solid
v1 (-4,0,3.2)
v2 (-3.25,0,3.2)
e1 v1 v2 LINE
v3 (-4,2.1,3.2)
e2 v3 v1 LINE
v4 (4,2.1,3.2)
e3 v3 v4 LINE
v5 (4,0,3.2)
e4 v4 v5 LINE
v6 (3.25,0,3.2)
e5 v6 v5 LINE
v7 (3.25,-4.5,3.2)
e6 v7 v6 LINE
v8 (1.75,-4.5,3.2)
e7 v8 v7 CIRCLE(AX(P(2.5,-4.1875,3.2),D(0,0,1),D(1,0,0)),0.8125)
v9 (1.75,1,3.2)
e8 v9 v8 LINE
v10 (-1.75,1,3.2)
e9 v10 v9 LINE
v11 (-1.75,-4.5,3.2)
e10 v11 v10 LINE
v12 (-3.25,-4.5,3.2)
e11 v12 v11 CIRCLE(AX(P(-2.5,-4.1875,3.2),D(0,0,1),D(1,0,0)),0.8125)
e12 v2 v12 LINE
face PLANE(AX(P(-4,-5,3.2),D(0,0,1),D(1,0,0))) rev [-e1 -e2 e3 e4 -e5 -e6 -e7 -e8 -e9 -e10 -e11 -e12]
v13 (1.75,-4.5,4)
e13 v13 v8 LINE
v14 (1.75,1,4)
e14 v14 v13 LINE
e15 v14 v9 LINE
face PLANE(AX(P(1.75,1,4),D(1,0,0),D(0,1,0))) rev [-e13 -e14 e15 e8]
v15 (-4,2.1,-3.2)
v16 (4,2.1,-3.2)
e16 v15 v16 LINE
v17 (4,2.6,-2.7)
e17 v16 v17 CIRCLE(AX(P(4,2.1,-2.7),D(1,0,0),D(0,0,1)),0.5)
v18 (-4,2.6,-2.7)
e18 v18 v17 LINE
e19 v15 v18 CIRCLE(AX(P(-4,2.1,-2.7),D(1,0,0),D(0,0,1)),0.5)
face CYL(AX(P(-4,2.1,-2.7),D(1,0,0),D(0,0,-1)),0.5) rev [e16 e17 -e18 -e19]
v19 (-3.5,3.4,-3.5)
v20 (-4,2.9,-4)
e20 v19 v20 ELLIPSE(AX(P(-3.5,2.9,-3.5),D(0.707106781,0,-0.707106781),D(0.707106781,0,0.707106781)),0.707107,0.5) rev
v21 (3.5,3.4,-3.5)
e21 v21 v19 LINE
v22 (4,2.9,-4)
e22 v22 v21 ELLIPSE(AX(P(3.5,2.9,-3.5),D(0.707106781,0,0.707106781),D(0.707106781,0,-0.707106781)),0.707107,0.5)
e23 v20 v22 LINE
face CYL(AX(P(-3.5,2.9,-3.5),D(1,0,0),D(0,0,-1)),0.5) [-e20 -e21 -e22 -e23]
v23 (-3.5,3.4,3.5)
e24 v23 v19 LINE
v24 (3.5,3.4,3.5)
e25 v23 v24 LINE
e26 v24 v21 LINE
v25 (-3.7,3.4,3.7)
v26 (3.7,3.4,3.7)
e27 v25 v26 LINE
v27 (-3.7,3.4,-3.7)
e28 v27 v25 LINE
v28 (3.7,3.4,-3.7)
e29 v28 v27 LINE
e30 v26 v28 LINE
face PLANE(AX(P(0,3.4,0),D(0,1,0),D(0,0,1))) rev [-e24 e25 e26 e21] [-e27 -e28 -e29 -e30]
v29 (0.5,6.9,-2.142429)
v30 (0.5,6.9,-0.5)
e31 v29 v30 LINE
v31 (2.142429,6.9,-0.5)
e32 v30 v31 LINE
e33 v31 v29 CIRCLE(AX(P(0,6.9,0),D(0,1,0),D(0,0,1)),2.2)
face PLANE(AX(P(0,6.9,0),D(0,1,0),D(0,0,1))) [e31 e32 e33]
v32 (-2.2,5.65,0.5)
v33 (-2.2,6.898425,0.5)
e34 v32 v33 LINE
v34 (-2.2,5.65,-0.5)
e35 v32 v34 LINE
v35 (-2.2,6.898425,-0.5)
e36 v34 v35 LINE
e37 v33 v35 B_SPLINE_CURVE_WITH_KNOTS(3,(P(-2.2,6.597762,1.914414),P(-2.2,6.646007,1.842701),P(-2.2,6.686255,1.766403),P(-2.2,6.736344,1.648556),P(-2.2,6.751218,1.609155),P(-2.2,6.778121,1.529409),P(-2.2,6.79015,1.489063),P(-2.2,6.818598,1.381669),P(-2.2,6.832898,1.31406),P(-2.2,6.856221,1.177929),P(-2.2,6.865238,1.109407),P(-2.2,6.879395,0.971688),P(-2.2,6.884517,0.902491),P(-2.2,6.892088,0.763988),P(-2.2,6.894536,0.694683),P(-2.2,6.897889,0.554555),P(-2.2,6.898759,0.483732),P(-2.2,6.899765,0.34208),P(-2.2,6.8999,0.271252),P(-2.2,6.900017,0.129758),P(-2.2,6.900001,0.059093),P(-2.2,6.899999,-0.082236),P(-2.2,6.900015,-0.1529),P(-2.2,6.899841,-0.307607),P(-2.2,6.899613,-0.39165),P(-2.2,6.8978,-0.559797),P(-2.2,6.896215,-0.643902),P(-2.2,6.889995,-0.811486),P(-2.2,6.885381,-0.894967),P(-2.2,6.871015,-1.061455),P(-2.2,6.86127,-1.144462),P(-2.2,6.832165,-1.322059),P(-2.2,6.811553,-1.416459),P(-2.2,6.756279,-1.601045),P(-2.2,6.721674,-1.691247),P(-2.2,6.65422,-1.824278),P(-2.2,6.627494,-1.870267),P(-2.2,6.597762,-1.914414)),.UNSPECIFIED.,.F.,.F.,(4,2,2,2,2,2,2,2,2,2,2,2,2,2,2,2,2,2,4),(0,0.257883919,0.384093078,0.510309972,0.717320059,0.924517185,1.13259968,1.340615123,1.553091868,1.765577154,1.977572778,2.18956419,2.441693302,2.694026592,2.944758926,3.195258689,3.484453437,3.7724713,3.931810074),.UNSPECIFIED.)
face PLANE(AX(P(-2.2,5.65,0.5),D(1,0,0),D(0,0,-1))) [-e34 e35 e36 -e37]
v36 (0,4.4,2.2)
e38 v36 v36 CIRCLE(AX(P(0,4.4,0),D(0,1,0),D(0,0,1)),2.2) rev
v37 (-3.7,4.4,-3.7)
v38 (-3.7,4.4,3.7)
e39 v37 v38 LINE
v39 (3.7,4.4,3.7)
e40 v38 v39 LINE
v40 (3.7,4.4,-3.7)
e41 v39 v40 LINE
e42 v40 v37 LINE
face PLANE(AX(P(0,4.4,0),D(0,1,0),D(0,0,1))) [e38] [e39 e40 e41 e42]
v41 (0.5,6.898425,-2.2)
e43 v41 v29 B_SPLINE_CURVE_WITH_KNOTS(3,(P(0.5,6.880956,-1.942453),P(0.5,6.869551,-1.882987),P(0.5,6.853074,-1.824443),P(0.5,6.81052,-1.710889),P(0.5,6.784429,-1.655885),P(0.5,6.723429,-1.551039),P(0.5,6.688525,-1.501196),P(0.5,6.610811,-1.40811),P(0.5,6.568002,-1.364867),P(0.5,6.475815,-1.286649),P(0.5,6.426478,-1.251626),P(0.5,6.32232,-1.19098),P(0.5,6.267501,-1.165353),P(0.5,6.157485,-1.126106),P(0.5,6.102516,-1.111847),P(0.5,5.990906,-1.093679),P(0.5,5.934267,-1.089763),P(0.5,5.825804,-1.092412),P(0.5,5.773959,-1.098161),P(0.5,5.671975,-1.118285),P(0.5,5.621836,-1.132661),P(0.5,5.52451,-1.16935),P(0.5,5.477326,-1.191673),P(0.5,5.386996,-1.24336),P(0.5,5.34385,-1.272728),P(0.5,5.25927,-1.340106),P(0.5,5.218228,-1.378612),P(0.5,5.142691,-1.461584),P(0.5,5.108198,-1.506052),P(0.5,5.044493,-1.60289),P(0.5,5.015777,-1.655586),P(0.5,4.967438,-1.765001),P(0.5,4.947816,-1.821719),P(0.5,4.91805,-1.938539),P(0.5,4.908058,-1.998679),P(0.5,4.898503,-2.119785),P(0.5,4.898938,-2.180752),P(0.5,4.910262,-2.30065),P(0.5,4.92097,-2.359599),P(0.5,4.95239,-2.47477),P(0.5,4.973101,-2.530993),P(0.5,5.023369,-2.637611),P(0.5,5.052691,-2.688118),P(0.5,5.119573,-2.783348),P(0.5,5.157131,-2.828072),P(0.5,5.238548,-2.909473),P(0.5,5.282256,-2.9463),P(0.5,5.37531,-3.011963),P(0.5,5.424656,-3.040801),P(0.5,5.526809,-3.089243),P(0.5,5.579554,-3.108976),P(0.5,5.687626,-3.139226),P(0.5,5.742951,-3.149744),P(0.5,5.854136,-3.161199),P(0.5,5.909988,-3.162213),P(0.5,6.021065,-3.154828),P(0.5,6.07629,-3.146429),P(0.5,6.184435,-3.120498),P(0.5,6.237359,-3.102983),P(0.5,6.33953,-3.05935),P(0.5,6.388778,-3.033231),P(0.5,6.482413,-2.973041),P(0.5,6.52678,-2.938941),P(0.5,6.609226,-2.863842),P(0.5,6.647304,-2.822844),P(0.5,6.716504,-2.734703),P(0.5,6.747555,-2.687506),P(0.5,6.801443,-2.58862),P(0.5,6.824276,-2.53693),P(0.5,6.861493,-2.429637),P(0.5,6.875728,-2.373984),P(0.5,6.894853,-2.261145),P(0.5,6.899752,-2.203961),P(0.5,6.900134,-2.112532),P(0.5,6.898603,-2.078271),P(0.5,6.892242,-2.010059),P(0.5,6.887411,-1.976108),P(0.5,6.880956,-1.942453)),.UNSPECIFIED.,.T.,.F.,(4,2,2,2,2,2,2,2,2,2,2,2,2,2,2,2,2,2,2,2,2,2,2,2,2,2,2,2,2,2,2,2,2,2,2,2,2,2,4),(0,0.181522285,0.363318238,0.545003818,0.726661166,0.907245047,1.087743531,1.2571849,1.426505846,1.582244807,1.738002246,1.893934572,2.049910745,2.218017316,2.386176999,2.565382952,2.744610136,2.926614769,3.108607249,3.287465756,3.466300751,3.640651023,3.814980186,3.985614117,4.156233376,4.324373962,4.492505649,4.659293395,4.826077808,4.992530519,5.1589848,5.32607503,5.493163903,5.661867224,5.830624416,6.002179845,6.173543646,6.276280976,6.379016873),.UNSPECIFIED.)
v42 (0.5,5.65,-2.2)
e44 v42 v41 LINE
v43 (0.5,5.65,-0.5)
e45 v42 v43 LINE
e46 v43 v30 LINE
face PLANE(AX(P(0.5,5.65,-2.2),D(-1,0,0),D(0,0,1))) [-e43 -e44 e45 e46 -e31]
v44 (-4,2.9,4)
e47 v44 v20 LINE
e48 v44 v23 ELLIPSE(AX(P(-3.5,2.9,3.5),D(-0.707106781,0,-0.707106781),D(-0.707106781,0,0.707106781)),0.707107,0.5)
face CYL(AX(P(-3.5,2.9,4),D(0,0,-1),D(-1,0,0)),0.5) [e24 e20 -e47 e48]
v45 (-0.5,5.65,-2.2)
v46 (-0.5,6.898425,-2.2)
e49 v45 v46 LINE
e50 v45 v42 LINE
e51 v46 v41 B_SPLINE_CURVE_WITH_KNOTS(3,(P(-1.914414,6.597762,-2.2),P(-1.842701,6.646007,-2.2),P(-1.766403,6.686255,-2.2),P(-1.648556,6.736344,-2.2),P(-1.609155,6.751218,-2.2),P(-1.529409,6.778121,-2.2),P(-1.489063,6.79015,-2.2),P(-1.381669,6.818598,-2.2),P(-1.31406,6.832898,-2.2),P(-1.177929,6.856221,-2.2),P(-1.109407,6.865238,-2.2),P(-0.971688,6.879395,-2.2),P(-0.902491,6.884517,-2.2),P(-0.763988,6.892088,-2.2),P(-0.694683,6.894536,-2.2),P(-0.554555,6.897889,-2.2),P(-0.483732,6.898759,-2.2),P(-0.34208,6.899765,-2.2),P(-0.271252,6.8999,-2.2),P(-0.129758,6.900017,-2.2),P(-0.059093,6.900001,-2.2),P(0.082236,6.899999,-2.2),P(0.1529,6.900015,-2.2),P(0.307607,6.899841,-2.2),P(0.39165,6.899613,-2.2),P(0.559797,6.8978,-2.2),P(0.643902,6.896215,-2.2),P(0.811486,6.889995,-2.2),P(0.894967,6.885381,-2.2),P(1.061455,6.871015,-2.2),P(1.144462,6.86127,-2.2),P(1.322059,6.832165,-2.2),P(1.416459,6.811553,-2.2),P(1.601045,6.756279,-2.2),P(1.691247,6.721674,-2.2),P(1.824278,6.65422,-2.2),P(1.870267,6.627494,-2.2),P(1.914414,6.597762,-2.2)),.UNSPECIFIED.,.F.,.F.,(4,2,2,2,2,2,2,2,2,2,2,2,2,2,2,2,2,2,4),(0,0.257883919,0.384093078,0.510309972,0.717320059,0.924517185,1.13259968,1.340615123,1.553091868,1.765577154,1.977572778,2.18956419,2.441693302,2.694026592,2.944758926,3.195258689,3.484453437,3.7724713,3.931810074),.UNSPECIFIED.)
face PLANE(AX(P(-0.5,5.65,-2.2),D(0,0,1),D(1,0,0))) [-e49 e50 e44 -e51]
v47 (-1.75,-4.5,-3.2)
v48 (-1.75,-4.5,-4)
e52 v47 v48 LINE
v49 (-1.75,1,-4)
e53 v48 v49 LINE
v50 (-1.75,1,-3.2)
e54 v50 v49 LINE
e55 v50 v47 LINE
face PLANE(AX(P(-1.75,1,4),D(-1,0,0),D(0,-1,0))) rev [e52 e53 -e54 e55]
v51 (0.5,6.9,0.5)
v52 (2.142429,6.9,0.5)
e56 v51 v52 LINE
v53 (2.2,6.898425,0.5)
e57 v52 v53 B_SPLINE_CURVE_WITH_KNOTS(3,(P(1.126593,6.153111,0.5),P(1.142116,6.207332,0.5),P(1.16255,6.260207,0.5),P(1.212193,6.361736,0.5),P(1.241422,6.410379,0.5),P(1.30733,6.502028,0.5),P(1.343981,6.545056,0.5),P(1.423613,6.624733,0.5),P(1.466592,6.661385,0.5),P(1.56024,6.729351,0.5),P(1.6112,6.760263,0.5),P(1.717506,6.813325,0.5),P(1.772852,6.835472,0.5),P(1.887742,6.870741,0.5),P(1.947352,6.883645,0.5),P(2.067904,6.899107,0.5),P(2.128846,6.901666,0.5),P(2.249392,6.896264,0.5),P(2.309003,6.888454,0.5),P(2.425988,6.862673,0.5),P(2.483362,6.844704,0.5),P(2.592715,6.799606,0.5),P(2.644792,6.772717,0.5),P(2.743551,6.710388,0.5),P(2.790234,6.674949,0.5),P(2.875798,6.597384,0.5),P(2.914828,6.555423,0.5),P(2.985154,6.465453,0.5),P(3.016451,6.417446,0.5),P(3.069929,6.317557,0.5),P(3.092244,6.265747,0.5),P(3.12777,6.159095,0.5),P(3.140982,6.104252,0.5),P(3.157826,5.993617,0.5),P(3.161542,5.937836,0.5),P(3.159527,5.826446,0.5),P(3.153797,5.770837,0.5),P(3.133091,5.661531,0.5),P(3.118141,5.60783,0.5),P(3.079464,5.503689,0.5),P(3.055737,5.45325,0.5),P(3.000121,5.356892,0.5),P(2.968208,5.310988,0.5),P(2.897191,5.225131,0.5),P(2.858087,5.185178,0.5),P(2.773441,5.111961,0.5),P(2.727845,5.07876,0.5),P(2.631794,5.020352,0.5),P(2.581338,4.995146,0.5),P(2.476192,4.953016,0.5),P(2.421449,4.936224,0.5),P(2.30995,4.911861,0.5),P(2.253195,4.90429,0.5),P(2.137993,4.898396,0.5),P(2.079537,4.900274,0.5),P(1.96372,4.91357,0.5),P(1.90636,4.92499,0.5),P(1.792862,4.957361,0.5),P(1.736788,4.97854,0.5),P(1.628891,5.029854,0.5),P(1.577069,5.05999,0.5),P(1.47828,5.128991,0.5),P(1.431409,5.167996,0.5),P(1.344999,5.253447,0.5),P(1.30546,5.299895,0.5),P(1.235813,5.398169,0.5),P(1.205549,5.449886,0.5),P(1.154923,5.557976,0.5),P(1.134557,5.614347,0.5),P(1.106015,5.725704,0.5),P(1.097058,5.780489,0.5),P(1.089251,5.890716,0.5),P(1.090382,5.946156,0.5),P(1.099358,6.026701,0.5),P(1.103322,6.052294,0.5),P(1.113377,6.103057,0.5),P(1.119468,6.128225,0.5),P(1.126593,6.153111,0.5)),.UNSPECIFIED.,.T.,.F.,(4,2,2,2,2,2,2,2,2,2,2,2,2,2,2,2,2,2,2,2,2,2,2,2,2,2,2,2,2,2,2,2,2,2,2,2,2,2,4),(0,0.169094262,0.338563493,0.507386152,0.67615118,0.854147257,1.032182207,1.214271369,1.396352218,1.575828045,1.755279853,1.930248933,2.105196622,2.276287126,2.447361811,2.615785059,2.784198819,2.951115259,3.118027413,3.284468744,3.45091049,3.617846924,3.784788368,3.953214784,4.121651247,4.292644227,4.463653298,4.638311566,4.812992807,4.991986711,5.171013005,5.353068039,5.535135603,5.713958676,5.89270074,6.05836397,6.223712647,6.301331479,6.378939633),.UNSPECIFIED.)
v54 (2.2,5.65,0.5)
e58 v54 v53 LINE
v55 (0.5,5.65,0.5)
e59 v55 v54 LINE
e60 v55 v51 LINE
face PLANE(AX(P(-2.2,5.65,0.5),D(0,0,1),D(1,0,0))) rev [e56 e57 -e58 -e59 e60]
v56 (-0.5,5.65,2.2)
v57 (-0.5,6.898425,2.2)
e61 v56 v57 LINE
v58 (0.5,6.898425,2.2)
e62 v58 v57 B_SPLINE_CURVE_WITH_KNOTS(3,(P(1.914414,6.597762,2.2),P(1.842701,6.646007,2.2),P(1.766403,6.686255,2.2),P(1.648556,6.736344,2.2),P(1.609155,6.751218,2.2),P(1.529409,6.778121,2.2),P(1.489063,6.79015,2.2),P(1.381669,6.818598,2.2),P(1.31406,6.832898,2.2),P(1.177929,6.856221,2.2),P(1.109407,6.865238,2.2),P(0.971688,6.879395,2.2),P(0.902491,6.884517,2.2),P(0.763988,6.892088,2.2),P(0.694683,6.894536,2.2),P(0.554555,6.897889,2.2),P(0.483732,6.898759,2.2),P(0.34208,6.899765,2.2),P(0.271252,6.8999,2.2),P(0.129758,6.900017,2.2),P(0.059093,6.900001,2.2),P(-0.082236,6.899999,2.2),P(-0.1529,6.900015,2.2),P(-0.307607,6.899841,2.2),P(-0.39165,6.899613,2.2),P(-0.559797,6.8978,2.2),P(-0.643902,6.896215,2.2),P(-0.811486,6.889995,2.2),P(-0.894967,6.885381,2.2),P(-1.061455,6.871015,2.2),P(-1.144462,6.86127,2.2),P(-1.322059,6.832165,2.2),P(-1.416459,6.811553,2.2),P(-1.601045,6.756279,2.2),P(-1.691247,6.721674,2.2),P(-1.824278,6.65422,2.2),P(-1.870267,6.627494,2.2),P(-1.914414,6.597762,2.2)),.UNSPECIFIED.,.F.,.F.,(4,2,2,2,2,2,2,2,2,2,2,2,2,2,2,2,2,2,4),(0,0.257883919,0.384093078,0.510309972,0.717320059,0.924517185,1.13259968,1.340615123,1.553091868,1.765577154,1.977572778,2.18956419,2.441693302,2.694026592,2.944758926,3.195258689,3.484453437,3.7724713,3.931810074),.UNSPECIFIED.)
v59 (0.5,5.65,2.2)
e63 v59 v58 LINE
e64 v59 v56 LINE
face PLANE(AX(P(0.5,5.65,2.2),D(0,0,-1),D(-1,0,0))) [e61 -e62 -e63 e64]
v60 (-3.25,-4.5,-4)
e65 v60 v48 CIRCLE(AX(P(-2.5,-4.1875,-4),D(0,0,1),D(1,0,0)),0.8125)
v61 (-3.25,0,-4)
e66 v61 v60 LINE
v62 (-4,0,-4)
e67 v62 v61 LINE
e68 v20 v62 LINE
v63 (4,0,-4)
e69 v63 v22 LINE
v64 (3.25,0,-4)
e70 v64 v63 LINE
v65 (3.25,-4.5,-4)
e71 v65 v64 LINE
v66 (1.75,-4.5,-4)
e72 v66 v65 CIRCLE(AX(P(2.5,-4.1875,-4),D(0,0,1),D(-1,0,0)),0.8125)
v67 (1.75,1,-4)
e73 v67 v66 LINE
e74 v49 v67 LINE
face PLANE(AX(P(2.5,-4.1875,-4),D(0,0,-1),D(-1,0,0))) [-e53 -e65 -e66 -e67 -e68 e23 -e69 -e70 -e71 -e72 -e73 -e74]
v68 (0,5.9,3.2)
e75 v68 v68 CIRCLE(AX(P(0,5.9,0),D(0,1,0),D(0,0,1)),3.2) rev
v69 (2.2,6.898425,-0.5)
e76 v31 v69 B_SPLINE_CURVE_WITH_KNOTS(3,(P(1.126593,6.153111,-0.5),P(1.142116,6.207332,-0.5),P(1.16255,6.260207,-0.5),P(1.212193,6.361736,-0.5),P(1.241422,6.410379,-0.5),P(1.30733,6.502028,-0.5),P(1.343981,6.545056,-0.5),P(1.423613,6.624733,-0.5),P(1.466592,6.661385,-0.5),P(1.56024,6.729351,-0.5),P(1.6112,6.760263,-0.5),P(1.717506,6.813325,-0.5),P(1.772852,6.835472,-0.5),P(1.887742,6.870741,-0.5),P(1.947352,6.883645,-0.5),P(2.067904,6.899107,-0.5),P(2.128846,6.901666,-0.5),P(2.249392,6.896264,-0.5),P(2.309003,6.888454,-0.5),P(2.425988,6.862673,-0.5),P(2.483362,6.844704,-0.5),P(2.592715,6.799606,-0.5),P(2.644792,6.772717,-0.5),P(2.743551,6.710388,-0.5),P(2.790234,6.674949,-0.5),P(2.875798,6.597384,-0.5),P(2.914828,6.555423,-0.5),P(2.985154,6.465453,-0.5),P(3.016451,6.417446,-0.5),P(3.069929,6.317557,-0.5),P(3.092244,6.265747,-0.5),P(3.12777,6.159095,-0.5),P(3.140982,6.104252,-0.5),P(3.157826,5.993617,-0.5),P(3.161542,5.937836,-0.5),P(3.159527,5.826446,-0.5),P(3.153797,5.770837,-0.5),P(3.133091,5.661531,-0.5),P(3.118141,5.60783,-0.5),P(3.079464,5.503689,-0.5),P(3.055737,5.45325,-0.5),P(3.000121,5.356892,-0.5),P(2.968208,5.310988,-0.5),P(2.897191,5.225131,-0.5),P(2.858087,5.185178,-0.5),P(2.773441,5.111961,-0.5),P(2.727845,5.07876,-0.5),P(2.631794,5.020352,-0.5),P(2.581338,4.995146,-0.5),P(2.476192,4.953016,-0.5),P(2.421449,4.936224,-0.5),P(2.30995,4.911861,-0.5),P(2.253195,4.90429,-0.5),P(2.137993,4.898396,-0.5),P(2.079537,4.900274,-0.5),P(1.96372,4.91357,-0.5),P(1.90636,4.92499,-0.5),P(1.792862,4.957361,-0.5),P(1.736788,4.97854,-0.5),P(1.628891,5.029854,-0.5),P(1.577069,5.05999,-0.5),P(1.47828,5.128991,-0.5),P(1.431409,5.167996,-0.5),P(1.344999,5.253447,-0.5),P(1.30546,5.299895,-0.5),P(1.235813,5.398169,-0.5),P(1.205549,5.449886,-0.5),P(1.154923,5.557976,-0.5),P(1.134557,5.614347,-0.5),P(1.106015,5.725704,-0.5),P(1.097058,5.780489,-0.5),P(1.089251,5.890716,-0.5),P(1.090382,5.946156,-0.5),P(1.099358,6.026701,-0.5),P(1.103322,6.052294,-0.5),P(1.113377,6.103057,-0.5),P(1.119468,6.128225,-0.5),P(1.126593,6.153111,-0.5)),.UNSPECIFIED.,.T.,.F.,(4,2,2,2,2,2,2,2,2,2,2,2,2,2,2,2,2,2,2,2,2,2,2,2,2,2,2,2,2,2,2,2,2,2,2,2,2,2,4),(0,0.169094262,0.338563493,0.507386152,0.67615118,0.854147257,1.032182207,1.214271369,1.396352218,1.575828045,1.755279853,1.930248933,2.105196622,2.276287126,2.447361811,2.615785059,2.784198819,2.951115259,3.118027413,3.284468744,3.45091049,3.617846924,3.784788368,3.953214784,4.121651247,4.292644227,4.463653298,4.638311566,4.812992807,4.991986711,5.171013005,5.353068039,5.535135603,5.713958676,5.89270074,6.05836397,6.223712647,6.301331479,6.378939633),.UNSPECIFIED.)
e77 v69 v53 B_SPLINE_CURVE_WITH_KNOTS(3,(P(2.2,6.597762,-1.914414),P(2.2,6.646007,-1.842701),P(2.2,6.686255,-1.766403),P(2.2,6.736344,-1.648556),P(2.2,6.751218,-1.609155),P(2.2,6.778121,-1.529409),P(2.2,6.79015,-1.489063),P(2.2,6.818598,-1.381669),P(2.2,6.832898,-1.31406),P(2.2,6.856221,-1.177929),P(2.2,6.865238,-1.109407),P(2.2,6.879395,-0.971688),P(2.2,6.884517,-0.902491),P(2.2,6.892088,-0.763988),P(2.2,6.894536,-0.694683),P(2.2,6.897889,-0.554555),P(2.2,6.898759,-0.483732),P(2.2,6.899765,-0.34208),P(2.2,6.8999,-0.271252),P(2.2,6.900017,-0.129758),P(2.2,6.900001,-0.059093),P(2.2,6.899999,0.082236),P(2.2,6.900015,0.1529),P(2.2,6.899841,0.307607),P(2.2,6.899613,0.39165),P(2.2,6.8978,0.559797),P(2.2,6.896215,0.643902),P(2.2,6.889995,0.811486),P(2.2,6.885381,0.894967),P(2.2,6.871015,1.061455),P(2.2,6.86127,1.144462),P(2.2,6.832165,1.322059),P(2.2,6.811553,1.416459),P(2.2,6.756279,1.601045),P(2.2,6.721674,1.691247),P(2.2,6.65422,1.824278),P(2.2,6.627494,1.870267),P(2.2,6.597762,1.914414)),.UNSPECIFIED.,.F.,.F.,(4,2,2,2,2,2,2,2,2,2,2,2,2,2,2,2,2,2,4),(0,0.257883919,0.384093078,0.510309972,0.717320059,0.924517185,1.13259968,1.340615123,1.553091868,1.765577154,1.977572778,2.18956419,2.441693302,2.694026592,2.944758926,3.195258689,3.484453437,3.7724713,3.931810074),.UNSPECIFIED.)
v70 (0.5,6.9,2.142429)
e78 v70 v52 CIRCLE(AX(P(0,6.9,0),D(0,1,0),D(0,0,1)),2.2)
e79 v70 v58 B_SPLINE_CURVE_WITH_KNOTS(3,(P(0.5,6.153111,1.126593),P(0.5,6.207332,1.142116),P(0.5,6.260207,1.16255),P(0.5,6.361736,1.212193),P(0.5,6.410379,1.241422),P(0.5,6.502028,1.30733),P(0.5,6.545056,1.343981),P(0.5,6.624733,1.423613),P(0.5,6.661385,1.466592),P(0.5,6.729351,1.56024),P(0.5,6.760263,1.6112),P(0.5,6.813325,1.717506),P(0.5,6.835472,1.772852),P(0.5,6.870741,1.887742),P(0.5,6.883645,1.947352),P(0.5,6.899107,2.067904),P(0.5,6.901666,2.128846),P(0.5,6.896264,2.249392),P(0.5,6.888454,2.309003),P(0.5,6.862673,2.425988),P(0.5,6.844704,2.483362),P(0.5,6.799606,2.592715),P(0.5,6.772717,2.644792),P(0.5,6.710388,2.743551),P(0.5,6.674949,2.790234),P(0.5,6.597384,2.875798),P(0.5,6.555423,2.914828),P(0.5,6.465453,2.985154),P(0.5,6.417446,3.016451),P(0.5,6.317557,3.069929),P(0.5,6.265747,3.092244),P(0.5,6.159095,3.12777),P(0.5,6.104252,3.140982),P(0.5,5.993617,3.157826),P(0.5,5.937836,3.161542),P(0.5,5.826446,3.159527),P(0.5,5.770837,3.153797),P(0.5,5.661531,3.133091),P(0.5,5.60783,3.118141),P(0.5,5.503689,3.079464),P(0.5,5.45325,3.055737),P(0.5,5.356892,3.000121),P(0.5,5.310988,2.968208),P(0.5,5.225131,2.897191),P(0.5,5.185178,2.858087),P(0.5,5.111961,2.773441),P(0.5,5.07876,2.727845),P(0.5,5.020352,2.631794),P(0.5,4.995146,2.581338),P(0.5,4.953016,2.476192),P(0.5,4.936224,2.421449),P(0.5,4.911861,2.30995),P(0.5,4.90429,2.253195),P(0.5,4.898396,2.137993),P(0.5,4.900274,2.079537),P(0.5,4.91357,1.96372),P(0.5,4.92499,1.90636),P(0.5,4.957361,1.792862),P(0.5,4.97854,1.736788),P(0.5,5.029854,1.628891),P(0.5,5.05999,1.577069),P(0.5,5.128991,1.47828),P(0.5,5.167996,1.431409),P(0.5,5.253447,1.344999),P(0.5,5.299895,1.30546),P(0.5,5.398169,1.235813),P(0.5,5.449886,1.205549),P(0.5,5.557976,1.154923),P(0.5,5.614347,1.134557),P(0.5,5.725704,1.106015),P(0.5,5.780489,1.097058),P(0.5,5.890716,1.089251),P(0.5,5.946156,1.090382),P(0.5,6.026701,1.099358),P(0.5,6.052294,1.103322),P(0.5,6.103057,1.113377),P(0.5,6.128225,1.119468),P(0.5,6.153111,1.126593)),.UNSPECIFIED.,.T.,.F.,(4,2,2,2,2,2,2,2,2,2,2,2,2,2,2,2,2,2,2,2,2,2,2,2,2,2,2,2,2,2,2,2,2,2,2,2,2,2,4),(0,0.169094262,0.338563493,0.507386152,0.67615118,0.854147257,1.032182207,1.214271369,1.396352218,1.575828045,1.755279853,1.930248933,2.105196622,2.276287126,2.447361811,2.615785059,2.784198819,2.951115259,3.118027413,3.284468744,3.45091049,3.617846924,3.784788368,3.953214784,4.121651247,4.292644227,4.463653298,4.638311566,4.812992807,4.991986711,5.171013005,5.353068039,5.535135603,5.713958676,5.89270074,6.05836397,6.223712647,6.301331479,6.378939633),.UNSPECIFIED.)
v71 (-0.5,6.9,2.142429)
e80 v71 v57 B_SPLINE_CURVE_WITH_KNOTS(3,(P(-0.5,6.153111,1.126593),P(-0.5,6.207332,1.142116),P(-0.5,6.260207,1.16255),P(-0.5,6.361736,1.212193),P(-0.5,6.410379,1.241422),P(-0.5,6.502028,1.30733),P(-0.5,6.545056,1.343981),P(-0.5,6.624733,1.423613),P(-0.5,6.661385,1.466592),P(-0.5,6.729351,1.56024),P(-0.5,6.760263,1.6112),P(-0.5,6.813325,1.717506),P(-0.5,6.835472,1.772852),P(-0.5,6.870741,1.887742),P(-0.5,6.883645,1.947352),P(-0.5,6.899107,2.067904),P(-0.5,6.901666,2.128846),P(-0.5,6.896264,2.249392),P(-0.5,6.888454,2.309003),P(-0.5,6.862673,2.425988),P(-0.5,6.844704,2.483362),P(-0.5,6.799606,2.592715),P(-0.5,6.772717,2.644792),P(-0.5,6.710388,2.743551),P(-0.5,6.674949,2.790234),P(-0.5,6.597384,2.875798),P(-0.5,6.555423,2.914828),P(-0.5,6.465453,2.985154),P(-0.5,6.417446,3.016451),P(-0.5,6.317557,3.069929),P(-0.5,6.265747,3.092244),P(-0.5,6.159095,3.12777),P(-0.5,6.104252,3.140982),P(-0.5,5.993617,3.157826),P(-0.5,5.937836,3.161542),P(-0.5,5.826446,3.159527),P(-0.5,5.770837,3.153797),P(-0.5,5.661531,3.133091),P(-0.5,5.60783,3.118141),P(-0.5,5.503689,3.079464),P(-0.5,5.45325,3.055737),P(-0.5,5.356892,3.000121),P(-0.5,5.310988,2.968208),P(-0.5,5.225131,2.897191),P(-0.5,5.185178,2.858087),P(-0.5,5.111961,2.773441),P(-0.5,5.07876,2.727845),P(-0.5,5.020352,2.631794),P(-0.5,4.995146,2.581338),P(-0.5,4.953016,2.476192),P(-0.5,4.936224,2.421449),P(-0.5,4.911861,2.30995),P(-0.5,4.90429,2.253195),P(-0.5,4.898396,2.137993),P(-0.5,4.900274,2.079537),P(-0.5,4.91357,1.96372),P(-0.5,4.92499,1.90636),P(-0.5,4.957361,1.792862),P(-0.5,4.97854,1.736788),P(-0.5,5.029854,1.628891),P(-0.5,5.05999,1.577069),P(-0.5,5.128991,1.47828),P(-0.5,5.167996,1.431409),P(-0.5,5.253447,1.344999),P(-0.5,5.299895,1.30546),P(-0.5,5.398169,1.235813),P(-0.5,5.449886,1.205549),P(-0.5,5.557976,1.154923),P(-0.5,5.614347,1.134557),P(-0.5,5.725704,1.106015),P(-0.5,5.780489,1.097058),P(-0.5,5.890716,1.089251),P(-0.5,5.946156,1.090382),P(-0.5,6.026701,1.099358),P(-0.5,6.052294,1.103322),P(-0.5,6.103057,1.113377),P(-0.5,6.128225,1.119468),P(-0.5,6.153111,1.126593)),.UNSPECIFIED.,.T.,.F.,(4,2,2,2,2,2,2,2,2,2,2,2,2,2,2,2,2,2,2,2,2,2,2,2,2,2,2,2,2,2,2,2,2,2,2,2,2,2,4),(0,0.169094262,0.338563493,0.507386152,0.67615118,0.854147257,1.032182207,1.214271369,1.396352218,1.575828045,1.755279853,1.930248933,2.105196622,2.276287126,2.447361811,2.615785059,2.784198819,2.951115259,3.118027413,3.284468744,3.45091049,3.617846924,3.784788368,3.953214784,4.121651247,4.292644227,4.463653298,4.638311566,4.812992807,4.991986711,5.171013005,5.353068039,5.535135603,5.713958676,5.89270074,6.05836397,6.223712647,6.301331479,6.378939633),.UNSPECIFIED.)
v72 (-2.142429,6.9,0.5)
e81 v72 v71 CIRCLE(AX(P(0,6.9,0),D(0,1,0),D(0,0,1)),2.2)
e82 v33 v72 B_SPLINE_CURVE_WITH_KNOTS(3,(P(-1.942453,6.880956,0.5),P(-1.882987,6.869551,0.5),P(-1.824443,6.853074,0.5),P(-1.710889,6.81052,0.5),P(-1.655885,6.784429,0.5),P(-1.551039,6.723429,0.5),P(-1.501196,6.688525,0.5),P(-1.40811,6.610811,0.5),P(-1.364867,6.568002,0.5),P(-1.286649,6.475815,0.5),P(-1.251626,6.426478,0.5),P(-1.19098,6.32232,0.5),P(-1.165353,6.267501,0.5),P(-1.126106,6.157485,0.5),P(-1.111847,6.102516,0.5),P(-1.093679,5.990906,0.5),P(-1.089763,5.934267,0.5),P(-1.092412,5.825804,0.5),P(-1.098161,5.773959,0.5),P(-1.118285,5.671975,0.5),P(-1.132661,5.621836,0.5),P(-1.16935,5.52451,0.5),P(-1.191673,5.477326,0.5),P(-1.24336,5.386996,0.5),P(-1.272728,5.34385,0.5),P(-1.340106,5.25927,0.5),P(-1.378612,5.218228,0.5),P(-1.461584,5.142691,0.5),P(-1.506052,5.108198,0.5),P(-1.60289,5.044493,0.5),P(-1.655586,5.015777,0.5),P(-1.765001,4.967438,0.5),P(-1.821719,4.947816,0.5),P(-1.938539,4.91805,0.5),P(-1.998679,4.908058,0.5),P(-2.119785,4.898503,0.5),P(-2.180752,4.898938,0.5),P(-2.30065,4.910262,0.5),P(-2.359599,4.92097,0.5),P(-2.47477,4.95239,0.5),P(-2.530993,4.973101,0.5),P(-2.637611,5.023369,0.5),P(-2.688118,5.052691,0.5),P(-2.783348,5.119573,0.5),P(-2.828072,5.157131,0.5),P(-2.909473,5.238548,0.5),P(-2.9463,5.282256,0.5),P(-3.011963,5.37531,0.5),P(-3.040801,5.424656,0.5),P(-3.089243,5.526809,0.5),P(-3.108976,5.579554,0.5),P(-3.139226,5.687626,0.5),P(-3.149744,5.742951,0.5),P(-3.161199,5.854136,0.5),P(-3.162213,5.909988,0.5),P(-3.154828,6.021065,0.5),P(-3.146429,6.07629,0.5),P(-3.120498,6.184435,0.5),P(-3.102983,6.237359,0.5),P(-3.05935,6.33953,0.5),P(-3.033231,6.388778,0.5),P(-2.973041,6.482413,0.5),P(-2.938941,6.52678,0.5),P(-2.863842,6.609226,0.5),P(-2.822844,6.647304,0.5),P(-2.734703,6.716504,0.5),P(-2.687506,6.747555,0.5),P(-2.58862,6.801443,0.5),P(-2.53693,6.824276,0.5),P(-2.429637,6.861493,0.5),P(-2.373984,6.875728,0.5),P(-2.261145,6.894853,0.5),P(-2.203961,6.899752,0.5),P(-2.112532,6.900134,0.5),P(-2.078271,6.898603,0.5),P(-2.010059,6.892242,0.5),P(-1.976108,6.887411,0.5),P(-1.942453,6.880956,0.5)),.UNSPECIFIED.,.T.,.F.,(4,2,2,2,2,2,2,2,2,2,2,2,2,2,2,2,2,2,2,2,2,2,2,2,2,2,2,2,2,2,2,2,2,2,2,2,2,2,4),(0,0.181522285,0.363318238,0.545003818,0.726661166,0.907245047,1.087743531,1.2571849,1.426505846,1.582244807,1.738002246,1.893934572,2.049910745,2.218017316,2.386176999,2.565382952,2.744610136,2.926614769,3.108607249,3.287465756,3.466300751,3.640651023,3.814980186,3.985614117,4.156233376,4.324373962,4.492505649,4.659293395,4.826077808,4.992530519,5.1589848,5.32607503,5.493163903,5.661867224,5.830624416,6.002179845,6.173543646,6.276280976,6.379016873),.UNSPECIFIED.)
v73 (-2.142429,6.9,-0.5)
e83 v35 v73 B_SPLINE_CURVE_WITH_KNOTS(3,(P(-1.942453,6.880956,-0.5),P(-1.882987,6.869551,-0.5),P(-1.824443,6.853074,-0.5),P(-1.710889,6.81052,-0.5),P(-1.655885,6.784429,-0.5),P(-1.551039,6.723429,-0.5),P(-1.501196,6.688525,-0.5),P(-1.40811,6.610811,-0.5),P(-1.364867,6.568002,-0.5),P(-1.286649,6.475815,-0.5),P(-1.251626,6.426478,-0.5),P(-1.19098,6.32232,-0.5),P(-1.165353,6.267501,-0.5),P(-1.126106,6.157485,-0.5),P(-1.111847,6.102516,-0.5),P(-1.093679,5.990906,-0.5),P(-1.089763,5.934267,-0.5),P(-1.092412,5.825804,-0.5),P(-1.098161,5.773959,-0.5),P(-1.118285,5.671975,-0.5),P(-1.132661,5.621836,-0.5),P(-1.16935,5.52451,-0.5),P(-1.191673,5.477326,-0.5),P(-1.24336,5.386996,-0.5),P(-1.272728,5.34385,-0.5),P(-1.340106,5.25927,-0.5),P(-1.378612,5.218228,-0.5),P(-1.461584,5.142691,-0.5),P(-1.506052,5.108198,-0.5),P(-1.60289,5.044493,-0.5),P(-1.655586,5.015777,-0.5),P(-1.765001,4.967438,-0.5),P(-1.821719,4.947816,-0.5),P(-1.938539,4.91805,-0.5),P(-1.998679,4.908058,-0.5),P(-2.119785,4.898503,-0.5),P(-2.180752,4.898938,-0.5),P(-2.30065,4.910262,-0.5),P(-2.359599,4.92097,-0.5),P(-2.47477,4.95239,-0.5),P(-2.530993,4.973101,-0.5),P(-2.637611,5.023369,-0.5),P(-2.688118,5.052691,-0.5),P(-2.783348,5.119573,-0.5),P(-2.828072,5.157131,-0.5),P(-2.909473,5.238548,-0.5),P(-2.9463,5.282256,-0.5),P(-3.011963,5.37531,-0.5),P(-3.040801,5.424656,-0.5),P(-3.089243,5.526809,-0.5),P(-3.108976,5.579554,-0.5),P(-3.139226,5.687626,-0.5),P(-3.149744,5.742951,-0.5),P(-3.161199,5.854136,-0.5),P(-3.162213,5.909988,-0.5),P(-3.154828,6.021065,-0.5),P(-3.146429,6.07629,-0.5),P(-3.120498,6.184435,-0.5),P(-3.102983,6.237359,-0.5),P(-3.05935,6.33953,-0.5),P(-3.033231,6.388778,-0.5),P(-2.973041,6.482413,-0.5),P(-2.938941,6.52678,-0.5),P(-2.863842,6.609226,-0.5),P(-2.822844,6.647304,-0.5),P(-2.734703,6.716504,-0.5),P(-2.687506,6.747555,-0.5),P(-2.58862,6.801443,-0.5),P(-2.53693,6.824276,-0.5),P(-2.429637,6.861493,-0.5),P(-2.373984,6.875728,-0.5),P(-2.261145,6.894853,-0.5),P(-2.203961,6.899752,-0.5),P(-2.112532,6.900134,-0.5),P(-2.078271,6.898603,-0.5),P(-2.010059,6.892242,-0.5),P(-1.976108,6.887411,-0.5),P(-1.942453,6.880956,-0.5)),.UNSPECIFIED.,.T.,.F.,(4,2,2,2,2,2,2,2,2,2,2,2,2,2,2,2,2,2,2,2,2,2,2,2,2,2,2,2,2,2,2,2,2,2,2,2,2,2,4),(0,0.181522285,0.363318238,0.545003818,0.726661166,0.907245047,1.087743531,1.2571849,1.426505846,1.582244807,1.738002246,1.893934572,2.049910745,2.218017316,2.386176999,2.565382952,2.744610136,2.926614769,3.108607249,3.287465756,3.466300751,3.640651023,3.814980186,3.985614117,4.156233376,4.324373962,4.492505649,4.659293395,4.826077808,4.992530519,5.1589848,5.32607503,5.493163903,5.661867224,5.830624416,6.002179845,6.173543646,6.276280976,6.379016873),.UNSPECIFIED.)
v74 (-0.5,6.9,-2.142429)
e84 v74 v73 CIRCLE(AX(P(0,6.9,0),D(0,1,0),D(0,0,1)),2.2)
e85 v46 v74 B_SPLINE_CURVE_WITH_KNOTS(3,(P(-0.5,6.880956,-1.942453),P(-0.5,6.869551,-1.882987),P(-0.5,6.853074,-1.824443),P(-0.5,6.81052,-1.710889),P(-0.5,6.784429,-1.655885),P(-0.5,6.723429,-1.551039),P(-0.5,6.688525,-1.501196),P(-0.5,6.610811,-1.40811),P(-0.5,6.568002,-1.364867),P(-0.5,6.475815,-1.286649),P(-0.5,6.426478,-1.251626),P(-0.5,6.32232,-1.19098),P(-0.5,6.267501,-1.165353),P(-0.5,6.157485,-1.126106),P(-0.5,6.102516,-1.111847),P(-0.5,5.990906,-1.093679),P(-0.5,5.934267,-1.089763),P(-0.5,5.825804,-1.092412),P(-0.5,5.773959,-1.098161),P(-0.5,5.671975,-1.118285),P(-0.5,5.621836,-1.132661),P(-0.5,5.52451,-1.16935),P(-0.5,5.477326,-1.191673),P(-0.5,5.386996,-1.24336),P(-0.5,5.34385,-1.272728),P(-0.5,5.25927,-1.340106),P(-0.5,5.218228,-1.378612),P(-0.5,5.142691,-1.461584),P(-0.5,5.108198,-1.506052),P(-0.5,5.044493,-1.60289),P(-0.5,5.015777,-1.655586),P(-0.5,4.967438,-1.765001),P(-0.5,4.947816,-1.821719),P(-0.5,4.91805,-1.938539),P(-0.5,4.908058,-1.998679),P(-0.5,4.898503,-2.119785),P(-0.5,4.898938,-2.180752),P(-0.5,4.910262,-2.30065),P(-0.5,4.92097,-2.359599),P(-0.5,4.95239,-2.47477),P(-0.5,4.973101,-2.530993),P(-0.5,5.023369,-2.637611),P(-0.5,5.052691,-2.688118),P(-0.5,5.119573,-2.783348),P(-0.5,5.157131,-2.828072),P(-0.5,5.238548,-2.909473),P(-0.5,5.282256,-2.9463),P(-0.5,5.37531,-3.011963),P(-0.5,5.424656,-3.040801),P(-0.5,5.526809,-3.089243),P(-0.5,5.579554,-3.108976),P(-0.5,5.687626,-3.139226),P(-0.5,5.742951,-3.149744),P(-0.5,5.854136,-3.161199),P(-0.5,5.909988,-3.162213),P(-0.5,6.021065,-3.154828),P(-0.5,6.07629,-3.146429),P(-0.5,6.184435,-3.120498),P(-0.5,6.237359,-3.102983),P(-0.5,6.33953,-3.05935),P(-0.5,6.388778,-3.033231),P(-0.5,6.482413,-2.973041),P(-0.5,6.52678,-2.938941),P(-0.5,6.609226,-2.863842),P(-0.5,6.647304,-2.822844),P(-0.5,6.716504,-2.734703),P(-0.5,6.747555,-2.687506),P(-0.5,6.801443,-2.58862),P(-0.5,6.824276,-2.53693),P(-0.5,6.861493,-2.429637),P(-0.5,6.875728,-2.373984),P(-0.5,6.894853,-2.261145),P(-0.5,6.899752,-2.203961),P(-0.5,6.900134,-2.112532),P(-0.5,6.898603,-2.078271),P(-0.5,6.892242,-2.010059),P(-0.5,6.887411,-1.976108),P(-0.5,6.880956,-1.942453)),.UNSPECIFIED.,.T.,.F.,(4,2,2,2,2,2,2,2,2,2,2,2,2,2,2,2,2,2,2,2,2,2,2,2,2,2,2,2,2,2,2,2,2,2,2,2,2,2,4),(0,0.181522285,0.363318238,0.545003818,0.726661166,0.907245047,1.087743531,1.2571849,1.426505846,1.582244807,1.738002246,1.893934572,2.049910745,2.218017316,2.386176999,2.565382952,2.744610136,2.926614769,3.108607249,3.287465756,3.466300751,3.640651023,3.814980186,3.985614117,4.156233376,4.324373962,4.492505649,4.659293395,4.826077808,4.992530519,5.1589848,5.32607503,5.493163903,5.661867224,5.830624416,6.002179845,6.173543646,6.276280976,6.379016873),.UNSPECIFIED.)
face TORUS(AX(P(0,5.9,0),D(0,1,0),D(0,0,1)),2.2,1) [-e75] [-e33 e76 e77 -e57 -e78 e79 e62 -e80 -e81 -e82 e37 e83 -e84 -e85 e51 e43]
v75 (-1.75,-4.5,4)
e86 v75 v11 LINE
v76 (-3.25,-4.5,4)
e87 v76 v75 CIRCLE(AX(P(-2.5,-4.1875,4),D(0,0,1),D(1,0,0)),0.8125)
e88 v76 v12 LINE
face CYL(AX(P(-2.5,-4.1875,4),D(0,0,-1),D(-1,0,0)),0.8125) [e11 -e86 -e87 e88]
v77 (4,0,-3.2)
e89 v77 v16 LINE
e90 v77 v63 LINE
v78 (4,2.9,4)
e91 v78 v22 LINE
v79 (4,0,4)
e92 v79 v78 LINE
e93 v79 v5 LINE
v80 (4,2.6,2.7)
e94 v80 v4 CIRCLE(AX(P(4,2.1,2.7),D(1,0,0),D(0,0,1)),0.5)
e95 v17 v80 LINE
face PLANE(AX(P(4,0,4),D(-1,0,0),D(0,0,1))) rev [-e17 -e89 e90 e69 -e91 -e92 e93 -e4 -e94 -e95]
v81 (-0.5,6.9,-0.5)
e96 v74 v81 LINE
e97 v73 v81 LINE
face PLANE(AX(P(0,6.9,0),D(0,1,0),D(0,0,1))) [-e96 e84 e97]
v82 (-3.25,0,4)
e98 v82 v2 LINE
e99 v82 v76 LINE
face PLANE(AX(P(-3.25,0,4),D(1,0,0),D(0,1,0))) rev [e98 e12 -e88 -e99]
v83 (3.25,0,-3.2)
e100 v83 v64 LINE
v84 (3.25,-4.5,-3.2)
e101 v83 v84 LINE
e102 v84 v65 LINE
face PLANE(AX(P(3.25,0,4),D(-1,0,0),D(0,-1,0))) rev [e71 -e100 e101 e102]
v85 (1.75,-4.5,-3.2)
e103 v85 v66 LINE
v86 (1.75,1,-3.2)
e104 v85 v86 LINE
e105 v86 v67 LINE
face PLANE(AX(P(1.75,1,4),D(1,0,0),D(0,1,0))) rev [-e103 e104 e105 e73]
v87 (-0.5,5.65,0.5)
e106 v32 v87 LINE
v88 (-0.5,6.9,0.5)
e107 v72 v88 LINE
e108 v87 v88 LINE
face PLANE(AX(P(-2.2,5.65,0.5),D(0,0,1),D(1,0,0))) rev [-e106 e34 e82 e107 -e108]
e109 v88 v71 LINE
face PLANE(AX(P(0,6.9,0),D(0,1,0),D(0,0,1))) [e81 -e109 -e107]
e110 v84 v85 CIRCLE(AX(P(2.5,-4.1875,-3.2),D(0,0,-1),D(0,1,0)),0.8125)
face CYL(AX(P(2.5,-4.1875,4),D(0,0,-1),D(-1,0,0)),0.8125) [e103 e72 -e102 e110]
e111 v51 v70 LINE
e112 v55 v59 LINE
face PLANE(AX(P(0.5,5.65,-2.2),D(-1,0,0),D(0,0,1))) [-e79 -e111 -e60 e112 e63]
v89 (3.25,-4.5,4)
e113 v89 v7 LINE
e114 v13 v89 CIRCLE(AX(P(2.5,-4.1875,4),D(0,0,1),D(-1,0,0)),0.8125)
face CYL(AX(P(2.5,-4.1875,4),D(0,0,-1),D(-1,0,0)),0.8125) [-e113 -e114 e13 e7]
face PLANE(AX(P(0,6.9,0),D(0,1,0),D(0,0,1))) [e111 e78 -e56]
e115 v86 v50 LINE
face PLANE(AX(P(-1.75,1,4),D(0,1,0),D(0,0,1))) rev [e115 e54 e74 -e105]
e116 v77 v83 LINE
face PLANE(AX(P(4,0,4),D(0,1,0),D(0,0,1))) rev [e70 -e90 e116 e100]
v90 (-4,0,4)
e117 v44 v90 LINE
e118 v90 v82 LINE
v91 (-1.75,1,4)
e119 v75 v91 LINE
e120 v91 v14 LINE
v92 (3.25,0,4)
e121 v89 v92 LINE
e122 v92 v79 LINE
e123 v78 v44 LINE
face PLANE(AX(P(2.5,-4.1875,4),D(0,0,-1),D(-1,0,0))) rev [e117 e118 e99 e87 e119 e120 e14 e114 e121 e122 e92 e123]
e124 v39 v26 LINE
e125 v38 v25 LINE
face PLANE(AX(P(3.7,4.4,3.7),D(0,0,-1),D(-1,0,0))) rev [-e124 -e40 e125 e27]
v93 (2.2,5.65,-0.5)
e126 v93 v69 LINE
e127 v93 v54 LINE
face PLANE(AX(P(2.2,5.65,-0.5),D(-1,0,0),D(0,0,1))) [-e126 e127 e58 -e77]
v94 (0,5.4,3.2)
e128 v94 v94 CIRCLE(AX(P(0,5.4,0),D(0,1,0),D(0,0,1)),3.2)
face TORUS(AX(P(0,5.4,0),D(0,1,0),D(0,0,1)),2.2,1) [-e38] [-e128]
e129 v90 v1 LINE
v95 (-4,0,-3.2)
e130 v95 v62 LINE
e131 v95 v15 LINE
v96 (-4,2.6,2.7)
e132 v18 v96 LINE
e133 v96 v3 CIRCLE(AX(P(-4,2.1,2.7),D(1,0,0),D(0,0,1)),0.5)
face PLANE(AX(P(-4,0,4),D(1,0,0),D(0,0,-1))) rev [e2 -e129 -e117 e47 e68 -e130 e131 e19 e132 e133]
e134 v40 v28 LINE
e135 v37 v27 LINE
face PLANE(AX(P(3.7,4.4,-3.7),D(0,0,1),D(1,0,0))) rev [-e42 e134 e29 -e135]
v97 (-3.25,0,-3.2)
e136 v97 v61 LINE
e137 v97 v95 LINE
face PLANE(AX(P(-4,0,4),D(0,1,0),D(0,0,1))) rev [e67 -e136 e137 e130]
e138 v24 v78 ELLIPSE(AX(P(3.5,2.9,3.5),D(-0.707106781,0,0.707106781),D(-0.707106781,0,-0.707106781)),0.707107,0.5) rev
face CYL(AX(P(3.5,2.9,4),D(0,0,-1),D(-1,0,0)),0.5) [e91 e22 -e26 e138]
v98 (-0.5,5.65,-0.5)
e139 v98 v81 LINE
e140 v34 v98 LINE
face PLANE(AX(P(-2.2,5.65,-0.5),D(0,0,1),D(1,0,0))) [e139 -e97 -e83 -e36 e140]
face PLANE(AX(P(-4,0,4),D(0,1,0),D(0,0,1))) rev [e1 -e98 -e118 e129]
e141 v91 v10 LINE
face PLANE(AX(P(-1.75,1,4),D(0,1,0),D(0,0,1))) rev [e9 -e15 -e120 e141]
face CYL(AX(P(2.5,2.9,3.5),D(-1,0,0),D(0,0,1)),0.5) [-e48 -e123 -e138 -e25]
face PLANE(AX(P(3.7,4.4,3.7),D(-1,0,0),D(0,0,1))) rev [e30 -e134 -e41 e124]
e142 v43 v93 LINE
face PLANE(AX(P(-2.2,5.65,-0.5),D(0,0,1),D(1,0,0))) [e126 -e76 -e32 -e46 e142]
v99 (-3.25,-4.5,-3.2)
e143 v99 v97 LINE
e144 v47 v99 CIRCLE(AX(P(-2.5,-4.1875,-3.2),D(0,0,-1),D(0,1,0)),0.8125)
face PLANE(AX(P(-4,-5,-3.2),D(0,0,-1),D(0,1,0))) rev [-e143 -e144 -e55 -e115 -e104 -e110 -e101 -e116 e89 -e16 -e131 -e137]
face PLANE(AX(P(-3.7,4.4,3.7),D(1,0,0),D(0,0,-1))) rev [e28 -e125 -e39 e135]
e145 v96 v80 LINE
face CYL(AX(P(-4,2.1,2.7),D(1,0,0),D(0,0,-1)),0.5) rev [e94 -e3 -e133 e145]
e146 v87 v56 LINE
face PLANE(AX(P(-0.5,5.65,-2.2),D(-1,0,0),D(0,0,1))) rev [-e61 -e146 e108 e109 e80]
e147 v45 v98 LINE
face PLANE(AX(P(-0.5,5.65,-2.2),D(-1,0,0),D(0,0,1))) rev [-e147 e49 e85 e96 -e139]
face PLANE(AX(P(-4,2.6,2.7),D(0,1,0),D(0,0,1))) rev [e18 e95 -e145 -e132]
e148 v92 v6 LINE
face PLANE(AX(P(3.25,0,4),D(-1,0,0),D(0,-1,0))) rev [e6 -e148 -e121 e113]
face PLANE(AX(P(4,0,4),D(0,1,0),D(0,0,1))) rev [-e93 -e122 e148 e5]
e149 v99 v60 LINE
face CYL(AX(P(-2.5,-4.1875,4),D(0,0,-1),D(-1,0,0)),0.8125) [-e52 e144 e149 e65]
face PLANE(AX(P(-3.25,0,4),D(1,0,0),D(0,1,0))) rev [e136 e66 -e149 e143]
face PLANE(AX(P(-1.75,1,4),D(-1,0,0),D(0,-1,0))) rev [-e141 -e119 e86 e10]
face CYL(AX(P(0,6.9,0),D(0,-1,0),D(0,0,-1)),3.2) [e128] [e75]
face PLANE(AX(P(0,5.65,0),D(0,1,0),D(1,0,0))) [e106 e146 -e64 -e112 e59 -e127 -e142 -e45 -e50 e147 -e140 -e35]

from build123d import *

# Parameters (mm, degrees)
BOSS_EXTRUDE1_DEPTH     = 4
CUT_EXTRUDE1_DEPTH      = 8.549834435
CUT_EXTRUDE1_DEPTH_BACK = 8.549834435
FILLET1_R               = 0.5
SKETCH4_R               = 1.5
BOSS_EXTRUDE2_DEPTH     = 1
SKETCH5_R               = 3.2
BOSS_EXTRUDE3_DEPTH     = 2.5
FILLET2_R               = 1
SKETCH6_W               = 1
SKETCH6_H               = 4.4
SKETCH6_W_2             = 4.4
SKETCH6_H_2             = 1
CUT_EXTRUDE_THIN1_DEPTH = 1.25
SKETCH8_W               = 7.4
SKETCH8_H               = 7.4
BOSS_EXTRUDE4_DEPTH     = 1


with BuildPart() as part:
    # Sketch1 → Boss-Extrude1 (new, symmetric)
    with BuildSketch(Plane.XY):
        with BuildLine():
            Line((-1.75, 1), (-1.75, -4.5))
            ThreePointArc((-1.75, -4.5), (-2.5, -5), (-3.25, -4.5))
            Line((-3.25, -4.5), (-3.25, 0))
            Line((-3.25, 0), (-4, 0))
            Line((-4, 0), (-4, 2.9))
            ThreePointArc((-4, 2.9), (-3.853553391, 3.253553391), (-3.5, 3.4))
            Line((-3.5, 3.4), (3.5, 3.4))
            ThreePointArc((3.5, 3.4), (3.853553391, 3.253553391), (4, 2.9))
            Line((4, 2.9), (4, 0))
            Line((4, 0), (3.25, 0))
            Line((3.25, 0), (3.25, -4.5))
            ThreePointArc((3.25, -4.5), (2.5, -5), (1.75, -4.5))
            Line((1.75, -4.5), (1.75, 1))
            Line((1.75, 1), (-1.75, 1))
        make_face()
    extrude(amount=BOSS_EXTRUDE1_DEPTH, both=True)

    # Sketch3 → Cut-Extrude1 (cut, two sides: drawn at the far end of the back side and taken through both)
    with BuildSketch(Plane(origin=(0, 0, 0), x_dir=(0, 0, -1), z_dir=(1, 0, 0)).offset(-CUT_EXTRUDE1_DEPTH_BACK)):
        with BuildLine():
            Line((-3.2, -5), (-3.2, 2.1))
            ThreePointArc((-3.2, 2.1), (-3.053553391, 2.453553391), (-2.7, 2.6))
            Line((-2.7, 2.6), (2.7, 2.6))
            ThreePointArc((2.7, 2.6), (3.053553391, 2.453553391), (3.2, 2.1))
            Line((3.2, 2.1), (3.2, -5))
            Line((3.2, -5), (-3.2, -5))
        make_face()
    extrude(amount=CUT_EXTRUDE1_DEPTH + CUT_EXTRUDE1_DEPTH_BACK, mode=Mode.SUBTRACT)

    # Fillet1
    # the kernel refuses this fillet: 0.5 mm, written as the material it takes off along each edge
    with BuildSketch(Plane(origin=(-4.75, 3.4, -4), x_dir=(0, -1, 0), z_dir=(1, 0, 0))) as fillet1_piece_1:
        with BuildLine():
            CenterArc((FILLET1_R, -FILLET1_R), FILLET1_R, 90, 90)
            Line((0, -FILLET1_R), (0, 0))
            Line((0, 0), (FILLET1_R, 0))
        make_face()
    extrude(amount=9.5, mode=Mode.SUBTRACT)
    with BuildSketch(Plane(origin=(-4.75, 3.4, 4), x_dir=(0, -1, 0), z_dir=(1, 0, 0))) as fillet1_piece_2:
        with BuildLine():
            CenterArc((FILLET1_R, FILLET1_R), FILLET1_R, 180, 90)
            Line((0, FILLET1_R), (0, 0))
            Line((0, 0), (FILLET1_R, 0))
        make_face()
    extrude(amount=9.5, mode=Mode.SUBTRACT)

    # Sketch4 → Boss-Extrude2 (add)
    with BuildSketch(Plane(origin=(0, 3.4, 0), x_dir=(1, 0, 0), z_dir=(0, 1, 0))):
        with Locations(Location((0, 0, 0), (0, 0, 90))):
            Circle(SKETCH4_R)
    extrude(amount=BOSS_EXTRUDE2_DEPTH)

    # Sketch5 → Boss-Extrude3 (add)
    with BuildSketch(Plane(origin=(0, 4.4, 0), x_dir=(1, 0, 0), z_dir=(0, 1, 0))):
        with Locations(Location((0, 0, 0), (0, 0, 270))):
            Circle(SKETCH5_R)
    extrude(amount=BOSS_EXTRUDE3_DEPTH)

    # Fillet2
    fillet2_edges = [part.edges().sort_by_distance(p)[0] for p in [
        (0, 4.4, -3.2),
        (0, 6.9, -3.2),
    ]]
    fillet(fillet2_edges, radius=FILLET2_R)

    # Sketch6 → Cut-Extrude-Thin1 (cut)
    with BuildSketch(Plane(origin=(0, 6.9, 0), x_dir=(1, 0, 0), z_dir=(0, 1, 0))):
        Rectangle(SKETCH6_W, SKETCH6_H)
        Rectangle(SKETCH6_W_2, SKETCH6_H_2)
    extrude(amount=-CUT_EXTRUDE_THIN1_DEPTH, mode=Mode.SUBTRACT)

    # Sketch8 → Boss-Extrude4 (add)
    with BuildSketch(Plane(origin=(0, 3.4, 0), x_dir=(1, 0, 0), z_dir=(0, 1, 0))):
        Rectangle(SKETCH8_W, SKETCH8_H)
    extrude(amount=BOSS_EXTRUDE4_DEPTH)


solid = part.part
